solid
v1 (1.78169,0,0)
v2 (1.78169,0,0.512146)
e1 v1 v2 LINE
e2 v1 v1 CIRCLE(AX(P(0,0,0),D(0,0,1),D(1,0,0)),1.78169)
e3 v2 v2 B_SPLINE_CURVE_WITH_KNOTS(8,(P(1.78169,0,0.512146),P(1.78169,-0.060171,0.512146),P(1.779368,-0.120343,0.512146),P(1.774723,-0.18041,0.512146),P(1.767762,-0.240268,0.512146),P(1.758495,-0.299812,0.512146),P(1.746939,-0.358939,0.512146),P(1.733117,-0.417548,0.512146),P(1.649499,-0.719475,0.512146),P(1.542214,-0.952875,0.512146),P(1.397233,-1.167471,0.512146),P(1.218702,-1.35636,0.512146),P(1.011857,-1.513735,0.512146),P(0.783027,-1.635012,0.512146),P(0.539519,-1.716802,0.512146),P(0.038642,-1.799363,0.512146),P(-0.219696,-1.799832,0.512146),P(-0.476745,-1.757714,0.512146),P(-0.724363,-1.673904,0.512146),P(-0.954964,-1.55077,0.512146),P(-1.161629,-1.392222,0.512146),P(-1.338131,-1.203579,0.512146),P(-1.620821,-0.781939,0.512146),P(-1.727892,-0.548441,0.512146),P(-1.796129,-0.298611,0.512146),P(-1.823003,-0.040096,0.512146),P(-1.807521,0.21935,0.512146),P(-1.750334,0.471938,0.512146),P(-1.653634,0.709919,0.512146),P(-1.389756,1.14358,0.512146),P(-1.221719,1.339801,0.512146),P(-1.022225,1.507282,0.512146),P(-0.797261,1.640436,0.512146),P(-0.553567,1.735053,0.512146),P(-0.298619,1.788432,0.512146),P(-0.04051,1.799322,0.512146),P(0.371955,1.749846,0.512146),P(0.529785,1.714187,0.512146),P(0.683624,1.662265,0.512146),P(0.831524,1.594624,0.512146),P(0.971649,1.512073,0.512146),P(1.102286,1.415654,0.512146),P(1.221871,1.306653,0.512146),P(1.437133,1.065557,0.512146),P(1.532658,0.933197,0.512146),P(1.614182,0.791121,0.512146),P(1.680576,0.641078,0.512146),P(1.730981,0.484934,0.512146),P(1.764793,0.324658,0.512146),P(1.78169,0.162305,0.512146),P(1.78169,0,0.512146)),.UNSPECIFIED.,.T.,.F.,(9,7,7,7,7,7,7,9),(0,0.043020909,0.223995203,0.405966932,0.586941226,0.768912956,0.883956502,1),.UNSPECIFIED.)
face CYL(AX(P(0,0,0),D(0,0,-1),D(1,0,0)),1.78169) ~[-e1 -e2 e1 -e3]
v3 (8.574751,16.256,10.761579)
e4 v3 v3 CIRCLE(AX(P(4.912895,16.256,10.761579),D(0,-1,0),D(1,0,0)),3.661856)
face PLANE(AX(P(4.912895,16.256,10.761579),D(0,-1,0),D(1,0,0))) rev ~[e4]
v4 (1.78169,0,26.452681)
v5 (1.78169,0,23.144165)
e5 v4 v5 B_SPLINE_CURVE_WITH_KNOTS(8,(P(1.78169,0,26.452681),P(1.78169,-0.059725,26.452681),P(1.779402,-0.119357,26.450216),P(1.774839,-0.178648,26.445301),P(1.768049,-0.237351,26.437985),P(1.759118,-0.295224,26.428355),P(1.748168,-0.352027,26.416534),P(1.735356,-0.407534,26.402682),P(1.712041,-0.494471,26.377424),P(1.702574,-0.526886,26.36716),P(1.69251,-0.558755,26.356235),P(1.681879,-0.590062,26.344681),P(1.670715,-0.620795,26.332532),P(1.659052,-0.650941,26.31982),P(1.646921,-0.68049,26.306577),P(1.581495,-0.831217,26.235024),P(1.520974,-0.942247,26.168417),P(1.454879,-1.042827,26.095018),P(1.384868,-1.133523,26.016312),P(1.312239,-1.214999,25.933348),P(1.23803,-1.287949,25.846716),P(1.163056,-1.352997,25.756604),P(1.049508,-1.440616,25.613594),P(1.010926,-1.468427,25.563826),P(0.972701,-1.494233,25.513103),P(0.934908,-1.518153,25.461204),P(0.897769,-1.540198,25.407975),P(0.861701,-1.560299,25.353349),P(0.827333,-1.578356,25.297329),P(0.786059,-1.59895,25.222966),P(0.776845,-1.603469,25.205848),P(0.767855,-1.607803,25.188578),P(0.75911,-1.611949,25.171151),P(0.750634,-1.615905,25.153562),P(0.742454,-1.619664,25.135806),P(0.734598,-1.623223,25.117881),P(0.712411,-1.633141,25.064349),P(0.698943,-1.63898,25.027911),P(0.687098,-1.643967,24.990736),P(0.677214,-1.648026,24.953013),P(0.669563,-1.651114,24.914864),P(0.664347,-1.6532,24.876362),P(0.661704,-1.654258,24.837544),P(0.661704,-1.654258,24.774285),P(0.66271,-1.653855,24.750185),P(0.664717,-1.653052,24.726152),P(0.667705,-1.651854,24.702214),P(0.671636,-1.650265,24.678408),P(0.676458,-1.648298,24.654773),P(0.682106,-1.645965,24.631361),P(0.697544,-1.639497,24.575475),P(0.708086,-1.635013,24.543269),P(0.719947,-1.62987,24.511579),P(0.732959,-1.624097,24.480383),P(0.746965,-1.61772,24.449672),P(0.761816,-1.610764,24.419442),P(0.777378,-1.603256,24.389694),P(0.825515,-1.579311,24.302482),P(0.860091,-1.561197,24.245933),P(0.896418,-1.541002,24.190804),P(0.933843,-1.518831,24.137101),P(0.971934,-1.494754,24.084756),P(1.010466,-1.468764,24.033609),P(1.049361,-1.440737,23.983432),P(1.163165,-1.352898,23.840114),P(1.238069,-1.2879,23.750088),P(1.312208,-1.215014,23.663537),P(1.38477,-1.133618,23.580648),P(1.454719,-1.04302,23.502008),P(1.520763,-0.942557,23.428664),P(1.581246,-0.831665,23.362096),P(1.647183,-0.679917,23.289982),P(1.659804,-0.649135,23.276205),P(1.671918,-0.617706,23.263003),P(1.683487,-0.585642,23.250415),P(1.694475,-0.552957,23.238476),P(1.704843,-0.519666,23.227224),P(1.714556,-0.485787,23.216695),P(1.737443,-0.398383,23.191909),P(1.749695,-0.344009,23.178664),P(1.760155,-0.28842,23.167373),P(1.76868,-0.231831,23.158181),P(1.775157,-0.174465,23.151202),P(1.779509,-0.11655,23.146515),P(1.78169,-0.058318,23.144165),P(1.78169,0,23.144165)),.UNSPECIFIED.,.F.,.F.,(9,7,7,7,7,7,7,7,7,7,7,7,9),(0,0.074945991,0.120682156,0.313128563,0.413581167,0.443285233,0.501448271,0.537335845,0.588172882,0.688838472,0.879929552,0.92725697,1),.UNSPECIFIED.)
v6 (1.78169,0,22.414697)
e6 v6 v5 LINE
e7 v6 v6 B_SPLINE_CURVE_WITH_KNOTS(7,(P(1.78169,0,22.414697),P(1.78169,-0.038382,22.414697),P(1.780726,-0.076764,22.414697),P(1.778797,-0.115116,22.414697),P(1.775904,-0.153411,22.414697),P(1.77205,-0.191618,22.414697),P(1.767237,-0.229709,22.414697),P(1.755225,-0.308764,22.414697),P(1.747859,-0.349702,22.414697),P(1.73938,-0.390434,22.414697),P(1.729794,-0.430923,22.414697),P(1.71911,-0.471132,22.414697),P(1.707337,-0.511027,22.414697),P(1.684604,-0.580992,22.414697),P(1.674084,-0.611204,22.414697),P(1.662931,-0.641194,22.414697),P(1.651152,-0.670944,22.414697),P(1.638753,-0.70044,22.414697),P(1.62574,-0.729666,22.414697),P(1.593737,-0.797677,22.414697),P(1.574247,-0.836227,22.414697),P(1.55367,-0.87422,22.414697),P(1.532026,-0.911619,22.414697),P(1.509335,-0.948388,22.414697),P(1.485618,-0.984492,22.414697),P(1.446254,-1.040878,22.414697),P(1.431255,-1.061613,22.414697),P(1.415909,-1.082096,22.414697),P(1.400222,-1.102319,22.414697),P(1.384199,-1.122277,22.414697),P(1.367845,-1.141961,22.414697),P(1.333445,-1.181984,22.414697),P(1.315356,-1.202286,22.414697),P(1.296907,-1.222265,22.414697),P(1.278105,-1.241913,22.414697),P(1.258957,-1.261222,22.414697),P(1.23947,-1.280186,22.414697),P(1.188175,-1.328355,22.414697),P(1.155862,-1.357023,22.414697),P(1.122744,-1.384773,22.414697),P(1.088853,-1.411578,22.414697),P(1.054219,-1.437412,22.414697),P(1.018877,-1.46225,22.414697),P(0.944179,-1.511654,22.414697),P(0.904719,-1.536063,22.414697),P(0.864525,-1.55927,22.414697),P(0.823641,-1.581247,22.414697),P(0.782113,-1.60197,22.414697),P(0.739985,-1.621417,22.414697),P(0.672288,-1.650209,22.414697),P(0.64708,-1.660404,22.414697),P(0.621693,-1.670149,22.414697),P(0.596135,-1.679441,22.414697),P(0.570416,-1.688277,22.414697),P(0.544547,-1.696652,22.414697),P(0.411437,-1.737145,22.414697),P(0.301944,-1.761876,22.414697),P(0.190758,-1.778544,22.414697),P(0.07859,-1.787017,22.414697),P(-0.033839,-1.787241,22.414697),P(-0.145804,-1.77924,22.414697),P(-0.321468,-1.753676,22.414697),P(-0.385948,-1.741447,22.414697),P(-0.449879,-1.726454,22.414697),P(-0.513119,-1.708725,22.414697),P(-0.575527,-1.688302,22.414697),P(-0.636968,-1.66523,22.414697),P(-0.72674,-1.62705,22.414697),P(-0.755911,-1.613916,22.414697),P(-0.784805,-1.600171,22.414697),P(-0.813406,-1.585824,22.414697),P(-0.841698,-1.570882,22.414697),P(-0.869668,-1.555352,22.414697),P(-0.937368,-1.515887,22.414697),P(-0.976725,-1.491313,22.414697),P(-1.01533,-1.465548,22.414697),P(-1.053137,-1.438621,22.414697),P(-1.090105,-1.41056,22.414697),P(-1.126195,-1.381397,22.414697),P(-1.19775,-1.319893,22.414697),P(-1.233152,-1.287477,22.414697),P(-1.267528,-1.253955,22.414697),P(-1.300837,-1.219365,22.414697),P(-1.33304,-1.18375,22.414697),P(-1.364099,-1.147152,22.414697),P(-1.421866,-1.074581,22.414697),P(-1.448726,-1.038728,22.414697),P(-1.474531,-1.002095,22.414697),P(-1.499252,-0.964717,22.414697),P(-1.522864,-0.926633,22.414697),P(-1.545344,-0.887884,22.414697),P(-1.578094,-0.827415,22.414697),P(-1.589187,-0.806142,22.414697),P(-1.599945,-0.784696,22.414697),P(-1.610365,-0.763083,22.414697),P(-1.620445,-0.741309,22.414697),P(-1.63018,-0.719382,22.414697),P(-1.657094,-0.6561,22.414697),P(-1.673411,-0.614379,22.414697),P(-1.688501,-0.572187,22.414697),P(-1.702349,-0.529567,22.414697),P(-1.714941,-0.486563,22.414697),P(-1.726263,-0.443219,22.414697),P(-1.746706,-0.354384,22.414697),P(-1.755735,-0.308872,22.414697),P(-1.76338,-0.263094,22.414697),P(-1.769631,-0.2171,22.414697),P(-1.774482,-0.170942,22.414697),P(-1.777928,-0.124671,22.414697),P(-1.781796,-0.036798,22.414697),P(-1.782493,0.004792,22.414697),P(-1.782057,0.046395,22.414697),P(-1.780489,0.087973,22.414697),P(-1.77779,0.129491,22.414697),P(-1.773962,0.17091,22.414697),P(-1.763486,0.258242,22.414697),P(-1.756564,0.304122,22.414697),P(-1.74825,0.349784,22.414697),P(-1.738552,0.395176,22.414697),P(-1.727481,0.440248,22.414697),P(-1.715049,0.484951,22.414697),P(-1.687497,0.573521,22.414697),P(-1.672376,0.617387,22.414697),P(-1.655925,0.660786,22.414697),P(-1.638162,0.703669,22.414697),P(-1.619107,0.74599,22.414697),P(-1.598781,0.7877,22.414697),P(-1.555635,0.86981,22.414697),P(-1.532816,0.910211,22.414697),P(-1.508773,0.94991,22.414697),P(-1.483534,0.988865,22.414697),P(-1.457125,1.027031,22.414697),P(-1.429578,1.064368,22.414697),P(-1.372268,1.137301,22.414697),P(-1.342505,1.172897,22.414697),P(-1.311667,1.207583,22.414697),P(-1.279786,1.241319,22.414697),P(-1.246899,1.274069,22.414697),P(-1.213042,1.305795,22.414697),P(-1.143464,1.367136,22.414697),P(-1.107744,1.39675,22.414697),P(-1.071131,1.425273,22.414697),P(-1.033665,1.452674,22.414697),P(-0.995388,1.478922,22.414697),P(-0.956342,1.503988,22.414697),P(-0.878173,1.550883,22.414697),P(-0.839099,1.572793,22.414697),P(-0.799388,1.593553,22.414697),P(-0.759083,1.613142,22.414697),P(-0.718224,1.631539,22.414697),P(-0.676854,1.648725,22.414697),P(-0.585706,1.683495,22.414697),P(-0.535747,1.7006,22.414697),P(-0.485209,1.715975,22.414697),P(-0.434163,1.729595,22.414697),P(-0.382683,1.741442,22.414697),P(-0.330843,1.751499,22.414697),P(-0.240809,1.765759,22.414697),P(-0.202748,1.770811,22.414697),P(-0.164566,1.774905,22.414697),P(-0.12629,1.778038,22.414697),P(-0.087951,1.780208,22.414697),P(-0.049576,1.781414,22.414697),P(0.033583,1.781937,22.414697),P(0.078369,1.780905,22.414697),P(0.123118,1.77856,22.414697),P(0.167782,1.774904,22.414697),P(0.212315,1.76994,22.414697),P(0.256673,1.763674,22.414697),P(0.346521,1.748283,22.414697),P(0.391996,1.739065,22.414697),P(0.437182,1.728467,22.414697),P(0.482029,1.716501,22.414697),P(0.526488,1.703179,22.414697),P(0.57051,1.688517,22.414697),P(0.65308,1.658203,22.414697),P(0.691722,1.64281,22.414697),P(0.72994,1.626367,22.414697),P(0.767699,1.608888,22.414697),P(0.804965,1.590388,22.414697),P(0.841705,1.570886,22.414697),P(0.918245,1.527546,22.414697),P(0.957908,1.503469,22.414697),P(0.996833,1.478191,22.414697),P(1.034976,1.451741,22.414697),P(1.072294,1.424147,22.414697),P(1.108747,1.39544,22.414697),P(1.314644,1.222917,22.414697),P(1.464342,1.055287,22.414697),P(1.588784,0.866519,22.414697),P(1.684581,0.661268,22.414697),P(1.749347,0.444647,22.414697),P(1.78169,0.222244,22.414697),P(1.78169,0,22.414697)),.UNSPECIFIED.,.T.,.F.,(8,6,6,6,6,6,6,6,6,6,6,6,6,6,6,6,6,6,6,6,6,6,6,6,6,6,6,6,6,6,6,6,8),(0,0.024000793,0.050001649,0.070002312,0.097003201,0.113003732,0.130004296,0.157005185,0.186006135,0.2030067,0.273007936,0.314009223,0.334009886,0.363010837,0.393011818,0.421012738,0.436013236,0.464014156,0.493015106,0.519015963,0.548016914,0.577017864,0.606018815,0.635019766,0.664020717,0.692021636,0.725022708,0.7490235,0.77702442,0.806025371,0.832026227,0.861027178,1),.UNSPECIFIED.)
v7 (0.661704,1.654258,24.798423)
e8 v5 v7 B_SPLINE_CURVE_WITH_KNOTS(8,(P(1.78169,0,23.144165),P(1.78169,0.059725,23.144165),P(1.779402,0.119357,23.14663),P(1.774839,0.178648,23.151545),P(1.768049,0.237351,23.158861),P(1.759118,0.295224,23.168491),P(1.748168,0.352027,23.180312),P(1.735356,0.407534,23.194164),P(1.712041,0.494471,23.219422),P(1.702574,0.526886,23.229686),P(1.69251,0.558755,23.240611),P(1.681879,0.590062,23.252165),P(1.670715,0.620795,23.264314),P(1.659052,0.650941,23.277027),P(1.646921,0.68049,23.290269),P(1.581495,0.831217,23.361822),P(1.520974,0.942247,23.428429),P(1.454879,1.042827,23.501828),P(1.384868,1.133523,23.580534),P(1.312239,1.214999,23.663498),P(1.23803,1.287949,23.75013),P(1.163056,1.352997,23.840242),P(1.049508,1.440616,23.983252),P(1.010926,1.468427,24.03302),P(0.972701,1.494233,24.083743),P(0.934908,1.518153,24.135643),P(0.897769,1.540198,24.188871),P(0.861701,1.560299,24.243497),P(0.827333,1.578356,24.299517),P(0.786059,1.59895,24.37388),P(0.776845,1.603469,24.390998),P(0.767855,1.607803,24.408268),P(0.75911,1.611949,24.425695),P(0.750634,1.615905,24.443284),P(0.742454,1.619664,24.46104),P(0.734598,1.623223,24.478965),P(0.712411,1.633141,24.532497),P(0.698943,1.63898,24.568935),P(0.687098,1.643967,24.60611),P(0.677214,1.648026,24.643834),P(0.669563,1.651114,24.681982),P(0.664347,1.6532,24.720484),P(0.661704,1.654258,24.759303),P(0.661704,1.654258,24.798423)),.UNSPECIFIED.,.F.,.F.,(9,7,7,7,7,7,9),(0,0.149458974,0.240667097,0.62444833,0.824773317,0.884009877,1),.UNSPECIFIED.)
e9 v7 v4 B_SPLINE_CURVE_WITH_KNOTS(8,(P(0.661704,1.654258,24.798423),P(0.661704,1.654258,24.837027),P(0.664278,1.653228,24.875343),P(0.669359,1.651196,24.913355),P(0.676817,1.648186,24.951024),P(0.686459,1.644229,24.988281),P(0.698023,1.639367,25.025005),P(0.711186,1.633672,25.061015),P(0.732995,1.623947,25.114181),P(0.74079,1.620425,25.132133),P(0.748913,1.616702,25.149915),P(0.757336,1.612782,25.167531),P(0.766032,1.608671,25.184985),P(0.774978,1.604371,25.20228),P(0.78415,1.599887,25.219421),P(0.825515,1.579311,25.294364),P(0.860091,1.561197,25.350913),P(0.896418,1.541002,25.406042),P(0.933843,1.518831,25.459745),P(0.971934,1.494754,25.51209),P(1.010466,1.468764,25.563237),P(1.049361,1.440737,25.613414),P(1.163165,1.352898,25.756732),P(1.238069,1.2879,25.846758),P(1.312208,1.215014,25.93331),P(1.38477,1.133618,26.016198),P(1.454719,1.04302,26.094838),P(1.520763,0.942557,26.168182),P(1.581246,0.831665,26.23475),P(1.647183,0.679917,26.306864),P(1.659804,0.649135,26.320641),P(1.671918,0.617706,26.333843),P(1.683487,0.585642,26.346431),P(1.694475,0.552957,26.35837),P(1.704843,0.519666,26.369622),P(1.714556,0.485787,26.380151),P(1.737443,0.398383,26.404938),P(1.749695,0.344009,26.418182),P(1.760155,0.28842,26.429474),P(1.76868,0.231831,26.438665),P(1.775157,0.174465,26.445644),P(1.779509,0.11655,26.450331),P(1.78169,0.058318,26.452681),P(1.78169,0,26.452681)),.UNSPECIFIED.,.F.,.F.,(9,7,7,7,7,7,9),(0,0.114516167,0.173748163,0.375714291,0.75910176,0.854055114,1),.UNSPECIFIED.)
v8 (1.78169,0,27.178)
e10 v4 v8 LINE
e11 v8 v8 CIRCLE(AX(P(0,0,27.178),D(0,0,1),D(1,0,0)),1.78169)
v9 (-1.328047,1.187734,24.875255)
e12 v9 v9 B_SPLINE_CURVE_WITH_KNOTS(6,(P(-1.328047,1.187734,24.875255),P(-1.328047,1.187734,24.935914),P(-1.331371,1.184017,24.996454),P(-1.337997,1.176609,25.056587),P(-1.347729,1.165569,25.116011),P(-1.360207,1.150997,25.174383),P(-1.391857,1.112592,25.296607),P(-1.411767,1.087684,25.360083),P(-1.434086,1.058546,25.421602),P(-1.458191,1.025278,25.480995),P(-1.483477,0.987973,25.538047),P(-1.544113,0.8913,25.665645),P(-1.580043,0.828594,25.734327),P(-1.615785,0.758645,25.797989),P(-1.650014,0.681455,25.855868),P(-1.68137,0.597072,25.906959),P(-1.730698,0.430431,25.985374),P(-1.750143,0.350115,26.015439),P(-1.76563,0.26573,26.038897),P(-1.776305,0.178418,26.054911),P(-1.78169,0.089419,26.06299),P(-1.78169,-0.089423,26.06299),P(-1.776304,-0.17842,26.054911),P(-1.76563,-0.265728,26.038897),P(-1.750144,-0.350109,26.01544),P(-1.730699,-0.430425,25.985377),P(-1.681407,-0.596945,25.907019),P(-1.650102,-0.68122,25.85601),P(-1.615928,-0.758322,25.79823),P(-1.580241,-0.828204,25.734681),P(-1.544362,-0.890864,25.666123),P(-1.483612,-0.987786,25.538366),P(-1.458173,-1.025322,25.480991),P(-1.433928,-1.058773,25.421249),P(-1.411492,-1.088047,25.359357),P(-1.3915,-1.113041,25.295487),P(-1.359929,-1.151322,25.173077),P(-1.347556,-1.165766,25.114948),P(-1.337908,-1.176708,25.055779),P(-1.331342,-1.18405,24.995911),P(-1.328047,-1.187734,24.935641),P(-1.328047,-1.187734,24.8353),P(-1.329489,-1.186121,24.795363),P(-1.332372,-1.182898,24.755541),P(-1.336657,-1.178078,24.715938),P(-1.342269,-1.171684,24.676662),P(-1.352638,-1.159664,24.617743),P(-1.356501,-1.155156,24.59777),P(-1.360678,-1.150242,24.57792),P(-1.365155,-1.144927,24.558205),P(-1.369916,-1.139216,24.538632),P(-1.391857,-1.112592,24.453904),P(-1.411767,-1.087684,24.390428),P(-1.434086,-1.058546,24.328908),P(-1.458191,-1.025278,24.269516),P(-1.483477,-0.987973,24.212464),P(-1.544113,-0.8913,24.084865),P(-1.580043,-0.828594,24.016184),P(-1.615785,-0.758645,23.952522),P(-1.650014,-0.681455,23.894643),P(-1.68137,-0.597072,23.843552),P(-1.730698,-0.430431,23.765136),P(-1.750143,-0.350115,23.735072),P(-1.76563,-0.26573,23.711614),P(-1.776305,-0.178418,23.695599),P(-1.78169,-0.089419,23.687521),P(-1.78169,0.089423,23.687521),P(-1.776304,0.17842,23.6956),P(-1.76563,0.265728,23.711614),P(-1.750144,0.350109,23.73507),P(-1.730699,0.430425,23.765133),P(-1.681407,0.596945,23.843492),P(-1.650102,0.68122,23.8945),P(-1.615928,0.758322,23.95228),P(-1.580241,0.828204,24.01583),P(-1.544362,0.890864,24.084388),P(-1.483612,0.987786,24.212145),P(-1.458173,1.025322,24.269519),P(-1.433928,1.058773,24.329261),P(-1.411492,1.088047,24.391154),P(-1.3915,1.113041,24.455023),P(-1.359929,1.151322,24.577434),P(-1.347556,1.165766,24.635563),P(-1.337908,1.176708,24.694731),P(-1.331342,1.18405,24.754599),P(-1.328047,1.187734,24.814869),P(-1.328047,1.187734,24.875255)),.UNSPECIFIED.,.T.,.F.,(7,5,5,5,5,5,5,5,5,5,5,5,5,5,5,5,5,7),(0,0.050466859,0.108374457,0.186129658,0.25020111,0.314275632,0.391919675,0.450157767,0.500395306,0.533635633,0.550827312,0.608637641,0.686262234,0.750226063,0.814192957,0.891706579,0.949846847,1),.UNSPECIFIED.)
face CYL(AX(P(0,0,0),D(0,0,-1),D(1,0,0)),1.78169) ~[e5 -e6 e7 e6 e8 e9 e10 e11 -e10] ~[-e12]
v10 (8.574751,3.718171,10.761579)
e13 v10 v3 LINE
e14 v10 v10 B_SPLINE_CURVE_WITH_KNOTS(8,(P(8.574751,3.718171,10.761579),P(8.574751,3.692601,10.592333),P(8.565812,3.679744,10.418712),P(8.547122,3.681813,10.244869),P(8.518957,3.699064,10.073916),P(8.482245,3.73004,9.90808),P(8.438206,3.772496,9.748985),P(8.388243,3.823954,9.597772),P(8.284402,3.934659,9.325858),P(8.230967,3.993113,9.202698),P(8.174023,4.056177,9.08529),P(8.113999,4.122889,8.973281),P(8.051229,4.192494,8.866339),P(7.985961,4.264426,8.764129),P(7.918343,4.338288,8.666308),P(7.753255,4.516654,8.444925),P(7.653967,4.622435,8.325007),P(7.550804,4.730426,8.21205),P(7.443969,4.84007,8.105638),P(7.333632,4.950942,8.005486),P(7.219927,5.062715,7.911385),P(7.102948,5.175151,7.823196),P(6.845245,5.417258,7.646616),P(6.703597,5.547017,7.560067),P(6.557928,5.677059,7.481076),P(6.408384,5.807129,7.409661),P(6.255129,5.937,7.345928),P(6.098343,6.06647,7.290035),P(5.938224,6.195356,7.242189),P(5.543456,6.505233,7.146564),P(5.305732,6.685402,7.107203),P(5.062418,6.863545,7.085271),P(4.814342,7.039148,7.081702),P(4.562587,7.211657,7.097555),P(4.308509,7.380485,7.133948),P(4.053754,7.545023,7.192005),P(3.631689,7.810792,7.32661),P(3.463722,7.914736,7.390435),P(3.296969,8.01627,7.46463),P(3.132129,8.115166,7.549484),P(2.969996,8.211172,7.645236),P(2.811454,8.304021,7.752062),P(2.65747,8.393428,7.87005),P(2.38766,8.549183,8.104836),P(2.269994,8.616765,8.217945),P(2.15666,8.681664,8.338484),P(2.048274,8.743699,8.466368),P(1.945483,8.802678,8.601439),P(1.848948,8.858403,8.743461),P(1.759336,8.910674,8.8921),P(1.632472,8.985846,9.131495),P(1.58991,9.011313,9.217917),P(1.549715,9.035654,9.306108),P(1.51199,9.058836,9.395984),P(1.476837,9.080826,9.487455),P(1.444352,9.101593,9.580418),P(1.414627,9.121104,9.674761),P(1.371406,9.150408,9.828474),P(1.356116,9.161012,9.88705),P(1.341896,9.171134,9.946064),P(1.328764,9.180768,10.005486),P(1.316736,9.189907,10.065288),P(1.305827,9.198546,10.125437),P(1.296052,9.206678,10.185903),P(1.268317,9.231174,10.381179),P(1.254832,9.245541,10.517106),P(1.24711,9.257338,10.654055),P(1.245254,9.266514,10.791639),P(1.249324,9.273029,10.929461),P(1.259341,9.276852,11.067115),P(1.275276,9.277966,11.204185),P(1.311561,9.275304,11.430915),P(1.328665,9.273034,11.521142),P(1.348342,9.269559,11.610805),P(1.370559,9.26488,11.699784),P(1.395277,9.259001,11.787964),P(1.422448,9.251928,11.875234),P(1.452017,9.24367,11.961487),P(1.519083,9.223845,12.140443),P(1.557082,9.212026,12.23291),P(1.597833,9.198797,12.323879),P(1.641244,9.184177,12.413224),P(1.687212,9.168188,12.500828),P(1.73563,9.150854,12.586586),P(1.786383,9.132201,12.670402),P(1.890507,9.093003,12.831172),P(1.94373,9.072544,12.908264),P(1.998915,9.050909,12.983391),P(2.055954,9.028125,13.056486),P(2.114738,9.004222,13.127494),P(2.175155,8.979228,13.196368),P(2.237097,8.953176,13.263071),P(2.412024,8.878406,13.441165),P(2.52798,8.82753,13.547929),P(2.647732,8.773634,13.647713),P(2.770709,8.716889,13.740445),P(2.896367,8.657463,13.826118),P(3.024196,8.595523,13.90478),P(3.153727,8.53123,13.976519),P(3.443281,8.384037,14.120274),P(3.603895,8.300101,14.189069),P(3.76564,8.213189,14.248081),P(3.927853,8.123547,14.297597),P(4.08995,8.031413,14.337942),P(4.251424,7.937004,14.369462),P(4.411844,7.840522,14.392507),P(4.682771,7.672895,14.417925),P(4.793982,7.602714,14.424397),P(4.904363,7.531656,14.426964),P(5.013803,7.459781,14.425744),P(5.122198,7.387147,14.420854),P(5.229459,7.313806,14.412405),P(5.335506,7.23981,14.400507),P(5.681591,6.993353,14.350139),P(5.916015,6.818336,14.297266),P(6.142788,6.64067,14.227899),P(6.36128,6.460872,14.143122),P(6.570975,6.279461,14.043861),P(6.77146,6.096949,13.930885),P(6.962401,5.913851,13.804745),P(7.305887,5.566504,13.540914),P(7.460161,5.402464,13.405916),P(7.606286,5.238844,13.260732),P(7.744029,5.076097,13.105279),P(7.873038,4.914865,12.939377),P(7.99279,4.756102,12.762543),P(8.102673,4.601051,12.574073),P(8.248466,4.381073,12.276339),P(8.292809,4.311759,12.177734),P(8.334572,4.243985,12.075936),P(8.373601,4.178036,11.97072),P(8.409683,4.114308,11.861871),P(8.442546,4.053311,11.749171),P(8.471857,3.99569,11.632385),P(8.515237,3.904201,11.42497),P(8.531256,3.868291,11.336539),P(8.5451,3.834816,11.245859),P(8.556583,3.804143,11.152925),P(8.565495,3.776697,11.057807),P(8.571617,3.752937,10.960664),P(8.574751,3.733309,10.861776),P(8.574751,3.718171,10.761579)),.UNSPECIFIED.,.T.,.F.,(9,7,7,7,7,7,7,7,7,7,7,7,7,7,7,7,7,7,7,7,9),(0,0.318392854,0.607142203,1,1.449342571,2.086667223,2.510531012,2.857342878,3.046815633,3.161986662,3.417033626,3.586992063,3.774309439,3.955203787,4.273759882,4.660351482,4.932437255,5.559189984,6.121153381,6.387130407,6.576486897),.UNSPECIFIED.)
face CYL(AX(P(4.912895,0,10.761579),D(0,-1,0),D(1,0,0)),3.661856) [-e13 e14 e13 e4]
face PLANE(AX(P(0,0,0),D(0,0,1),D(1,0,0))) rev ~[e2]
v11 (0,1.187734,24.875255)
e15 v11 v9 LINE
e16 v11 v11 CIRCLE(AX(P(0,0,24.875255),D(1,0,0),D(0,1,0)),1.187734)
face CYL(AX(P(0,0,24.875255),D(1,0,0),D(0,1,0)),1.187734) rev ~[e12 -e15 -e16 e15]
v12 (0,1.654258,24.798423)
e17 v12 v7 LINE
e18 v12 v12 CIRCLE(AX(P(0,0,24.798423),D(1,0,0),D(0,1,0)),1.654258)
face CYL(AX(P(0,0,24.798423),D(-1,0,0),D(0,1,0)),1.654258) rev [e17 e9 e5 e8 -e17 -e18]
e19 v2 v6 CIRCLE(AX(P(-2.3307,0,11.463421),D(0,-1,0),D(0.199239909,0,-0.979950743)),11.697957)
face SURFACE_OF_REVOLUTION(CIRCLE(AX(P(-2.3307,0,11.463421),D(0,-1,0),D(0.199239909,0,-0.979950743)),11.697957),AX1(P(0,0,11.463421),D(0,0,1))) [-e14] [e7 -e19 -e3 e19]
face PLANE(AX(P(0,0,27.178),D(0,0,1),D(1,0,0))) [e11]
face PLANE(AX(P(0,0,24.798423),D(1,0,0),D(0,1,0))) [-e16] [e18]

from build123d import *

# Parameters (mm, degrees)
F4_R      = 3.6618559104
F5_DEPTH  = 16.256
F6_R      = 1.7816904606
F7_DEPTH  = 27.178
F8_R      = 1.1877343137
F9_DEPTH  = 72.136
F10_R     = 1.6542577125
F11_DEPTH = 132.588


# Not quite as in the source:
# - the program builds the solid bodies; features that only make, move or delete a surface that nothing else refers to are left out


with BuildPart() as f1:
    # F0 (on Front) → F1 (revolve)
    with BuildSketch(Plane.XZ):
        with BuildLine():
            Line((0, 22.9268427938), (0, 0))
            ThreePointArc((0, 0), (9.3672569036, 11.4634213969), (0, 22.9268427938))
        make_face()
    revolve(axis=Axis((0, 0, 11.4634213969), (0, 0, 1)))

    # F4 (on Front) → F5 (join)
    with BuildSketch(Plane.XZ):
        with Locations((4.9128951505, 10.7615785673)):
            Circle(F4_R)
    extrude(amount=-F5_DEPTH)

    # F6 (on Top) → F7 (join)
    with BuildSketch(Plane.XY):
        Circle(F6_R)
    extrude(amount=F7_DEPTH)

    # F8 (on Right) → F9 (cut)
    with BuildSketch(Plane.YZ):
        with Locations((0, 24.8752553016)):
            Circle(F8_R)
    extrude(amount=-F9_DEPTH, mode=Mode.SUBTRACT)

    # F10 (on Right) → F11 (cut)
    with BuildSketch(Plane.YZ):
        with Locations((0, 24.7984230518)):
            Circle(F10_R)
    extrude(amount=F11_DEPTH, mode=Mode.SUBTRACT)


solid = f1.part
